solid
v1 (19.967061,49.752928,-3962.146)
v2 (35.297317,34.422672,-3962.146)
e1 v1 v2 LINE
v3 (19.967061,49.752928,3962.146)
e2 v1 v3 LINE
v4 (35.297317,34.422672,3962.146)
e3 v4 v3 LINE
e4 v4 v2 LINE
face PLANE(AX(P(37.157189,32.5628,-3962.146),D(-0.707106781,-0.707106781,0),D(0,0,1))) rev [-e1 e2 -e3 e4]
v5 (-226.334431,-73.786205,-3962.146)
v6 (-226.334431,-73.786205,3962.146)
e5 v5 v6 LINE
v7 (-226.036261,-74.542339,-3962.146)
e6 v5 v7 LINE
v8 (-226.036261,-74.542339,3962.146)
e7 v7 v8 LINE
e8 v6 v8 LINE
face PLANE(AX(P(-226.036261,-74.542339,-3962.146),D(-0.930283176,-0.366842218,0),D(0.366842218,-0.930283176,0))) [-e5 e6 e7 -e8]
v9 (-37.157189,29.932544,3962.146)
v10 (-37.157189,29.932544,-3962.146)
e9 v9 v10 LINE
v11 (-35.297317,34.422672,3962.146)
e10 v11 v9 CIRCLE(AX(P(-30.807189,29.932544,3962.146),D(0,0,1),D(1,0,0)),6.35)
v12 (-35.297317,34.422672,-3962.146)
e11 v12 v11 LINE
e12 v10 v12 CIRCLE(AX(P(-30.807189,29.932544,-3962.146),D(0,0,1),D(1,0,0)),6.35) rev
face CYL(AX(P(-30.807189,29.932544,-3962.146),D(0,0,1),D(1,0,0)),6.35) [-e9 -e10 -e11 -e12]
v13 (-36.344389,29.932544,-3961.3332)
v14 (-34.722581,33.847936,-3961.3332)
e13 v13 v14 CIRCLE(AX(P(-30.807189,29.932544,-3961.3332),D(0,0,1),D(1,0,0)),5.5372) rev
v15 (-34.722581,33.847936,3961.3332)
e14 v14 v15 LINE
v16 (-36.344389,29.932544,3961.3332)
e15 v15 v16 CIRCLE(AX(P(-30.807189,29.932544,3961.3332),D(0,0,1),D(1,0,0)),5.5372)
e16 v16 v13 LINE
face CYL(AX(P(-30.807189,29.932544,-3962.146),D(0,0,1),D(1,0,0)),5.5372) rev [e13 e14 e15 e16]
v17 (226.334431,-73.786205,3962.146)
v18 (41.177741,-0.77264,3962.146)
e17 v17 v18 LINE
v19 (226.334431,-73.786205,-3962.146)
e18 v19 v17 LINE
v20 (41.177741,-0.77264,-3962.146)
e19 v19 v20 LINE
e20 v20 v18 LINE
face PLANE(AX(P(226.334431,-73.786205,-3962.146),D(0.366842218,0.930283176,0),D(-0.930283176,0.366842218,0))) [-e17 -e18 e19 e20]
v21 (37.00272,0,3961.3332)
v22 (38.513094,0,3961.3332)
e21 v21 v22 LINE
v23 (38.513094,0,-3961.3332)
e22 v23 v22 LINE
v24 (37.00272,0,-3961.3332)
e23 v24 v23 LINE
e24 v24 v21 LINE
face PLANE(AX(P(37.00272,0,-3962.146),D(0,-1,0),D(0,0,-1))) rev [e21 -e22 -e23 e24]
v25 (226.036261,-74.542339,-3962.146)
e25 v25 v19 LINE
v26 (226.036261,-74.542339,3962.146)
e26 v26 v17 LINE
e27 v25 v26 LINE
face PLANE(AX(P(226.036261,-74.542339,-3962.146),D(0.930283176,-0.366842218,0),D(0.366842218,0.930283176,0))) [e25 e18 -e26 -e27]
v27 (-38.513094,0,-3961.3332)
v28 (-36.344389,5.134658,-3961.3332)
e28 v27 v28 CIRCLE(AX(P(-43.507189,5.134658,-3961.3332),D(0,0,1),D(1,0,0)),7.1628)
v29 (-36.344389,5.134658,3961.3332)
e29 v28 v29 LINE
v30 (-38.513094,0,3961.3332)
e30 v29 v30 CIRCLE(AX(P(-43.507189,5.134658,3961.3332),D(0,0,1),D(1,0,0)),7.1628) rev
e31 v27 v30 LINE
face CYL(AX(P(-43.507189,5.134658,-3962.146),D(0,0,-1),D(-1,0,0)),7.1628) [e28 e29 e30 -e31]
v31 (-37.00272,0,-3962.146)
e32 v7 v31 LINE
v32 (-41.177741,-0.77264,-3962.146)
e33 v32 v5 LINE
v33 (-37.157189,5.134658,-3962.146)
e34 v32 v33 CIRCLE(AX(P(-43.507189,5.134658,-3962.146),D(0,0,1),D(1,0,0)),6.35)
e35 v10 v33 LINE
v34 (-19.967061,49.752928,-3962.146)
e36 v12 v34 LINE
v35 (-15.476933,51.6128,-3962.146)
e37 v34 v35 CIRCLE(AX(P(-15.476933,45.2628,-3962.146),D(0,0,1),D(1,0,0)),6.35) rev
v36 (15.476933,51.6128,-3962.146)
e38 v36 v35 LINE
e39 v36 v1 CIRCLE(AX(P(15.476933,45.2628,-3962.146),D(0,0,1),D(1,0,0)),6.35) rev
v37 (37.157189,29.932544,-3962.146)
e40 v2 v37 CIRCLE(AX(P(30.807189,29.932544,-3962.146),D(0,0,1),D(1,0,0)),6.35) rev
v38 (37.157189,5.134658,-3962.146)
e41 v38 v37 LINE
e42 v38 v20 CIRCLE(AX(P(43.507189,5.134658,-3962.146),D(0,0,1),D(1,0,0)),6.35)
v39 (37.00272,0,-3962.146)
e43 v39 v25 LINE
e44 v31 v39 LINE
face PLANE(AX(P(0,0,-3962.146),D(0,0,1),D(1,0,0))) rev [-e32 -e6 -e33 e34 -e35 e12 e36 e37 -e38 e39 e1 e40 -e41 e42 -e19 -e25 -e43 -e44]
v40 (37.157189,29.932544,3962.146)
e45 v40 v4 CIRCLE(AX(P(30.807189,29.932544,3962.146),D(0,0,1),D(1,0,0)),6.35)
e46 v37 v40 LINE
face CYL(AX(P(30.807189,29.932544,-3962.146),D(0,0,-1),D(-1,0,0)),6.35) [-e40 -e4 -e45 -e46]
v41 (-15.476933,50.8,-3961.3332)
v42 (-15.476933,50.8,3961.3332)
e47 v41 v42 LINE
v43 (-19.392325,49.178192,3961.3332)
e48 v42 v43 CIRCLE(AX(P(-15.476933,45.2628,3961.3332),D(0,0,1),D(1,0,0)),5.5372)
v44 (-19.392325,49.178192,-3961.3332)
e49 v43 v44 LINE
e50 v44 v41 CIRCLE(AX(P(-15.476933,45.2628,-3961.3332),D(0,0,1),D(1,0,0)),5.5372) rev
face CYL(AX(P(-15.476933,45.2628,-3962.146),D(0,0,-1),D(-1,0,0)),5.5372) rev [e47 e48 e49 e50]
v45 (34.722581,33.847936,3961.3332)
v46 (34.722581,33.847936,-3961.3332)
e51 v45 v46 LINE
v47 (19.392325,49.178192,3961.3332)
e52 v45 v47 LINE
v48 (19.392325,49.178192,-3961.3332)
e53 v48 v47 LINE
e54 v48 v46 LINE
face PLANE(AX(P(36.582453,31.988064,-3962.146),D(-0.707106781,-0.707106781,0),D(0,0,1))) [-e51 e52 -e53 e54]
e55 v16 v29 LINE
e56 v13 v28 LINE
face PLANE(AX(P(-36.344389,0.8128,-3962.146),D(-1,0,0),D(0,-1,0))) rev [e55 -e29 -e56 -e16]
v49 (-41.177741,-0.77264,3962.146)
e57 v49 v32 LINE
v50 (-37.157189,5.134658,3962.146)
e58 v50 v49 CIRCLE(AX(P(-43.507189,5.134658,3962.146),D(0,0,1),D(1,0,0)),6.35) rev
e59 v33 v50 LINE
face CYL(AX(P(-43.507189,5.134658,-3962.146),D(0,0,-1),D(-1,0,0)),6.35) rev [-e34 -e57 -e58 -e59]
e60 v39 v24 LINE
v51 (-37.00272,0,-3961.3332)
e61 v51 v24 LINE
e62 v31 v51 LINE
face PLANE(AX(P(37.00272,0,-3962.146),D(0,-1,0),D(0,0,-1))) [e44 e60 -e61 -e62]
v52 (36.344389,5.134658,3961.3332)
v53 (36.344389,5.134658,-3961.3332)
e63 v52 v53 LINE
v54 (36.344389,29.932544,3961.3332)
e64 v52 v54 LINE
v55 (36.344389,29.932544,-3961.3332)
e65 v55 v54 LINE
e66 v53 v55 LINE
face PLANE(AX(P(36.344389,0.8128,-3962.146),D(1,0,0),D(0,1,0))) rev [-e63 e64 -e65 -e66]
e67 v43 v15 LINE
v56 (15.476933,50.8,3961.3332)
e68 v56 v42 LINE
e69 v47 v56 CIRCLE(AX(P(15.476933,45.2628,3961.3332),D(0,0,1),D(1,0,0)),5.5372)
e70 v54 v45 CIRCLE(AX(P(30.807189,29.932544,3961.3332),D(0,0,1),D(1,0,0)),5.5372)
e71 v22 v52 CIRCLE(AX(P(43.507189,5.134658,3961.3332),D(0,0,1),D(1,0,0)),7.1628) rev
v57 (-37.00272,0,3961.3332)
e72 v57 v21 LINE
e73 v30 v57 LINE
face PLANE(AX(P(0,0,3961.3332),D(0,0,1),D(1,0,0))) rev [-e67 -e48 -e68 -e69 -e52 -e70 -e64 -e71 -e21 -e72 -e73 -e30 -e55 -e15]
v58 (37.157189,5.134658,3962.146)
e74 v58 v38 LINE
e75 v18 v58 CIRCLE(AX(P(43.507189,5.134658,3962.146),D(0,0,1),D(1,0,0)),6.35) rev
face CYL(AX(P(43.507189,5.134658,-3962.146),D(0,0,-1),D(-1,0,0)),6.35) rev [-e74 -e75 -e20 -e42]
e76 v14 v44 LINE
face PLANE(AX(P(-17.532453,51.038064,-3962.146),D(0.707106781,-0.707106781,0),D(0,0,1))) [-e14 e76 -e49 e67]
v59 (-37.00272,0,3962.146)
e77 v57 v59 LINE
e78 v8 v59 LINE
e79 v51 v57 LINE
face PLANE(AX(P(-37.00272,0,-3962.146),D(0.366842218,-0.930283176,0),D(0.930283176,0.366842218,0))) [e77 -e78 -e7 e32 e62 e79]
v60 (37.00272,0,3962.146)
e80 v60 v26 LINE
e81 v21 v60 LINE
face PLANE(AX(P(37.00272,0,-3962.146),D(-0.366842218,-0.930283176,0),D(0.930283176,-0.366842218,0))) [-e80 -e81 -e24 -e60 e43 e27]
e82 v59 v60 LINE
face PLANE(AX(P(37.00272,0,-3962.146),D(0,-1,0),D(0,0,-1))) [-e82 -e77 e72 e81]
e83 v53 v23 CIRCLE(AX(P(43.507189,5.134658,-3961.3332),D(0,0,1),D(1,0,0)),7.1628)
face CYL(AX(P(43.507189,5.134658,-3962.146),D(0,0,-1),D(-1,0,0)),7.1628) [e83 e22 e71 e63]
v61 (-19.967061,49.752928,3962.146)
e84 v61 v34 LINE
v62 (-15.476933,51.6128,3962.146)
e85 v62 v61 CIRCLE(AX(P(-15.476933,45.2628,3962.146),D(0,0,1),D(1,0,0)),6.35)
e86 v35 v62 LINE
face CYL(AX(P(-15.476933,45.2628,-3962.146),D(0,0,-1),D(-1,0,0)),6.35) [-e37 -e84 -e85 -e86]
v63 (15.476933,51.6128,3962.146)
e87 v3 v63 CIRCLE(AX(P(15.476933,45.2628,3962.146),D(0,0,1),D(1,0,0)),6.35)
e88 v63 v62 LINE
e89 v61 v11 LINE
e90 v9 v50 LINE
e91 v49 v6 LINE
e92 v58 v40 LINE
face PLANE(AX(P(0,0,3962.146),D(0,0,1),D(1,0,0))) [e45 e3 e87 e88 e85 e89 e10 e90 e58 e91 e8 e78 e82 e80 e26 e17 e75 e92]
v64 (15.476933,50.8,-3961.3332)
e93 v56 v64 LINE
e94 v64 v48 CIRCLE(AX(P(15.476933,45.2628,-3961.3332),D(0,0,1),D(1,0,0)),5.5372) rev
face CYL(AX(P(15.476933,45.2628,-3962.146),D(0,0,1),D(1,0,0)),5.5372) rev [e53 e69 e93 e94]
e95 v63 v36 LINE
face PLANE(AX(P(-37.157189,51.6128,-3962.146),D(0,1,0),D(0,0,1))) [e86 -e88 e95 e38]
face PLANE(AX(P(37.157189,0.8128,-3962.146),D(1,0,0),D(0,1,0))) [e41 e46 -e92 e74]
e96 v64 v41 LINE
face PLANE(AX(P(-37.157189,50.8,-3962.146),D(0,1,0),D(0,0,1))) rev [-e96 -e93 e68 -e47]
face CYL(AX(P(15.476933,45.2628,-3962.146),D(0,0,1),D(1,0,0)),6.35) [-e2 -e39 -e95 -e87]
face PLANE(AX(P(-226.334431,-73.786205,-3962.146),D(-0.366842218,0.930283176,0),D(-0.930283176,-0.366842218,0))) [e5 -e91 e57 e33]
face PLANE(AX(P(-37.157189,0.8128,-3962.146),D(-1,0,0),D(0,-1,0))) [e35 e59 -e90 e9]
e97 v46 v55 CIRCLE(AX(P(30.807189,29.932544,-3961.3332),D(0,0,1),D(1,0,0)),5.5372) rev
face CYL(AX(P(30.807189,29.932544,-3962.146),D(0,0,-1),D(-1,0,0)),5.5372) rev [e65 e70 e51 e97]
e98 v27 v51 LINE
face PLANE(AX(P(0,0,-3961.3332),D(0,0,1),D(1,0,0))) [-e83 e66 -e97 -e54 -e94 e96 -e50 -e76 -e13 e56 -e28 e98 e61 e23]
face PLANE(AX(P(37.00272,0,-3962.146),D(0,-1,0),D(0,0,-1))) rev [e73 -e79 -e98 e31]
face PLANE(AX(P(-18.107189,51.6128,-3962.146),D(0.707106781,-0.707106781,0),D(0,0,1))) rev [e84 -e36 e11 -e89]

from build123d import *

# Parameters (mm, degrees)
BOSS_EXTRUDE1_DEPTH      = 3962.146
BOSS_EXTRUDE1_DEPTH_BACK = 3962.146
CHAMFER1_SIZE            = 19.05
FILLET1_R                = 6.35
SHELL1_START             = -3961.3332
SHELL1_DEPTH             = 7922.6664


# Read off the part's stored shape, not the designer's step: Shell1
with BuildPart() as part:
    # Sketch1 → Boss-Extrude1 (new, two sides: drawn at the far end of the back side and taken through both)
    with BuildSketch(Plane.XY.offset(-BOSS_EXTRUDE1_DEPTH_BACK)):
        Polygon((-37.157189229, 0.8128), (-37.157189229, 51.6128), (37.157189229, 51.6128), (37.157189229, 0.8128), (226.334430672, -73.786204522), (226.036261318, -74.542338687), (37.00272, 0), (-37.00272, 0), (-226.036261318, -74.542338687), (-226.334430672, -73.786204522), align=None)
    extrude(amount=BOSS_EXTRUDE1_DEPTH + BOSS_EXTRUDE1_DEPTH_BACK)

    # Chamfer1
    chamfer1_edges = [part.edges().sort_by_distance(p)[0] for p in [
        (-37.157189229, 51.6128, 0),
        (37.157189229, 51.6128, 0),
    ]]
    chamfer(chamfer1_edges, length=CHAMFER1_SIZE)

    # Fillet1
    fillet1_edges = [part.edges().sort_by_distance(p)[0] for p in [
        (-37.157189229, 0.8128, 0),
        (37.157189229, 0.8128, 0),
        (37.157189229, 32.5628, 0),
        (-18.107189229, 51.6128, 0),
        (18.107189229, 51.6128, 0),
        (-37.157189229, 32.5628, 0),
    ]]
    fillet(fillet1_edges, radius=FILLET1_R)

    # Shell1 outline → Shell1 (cut)
    with BuildSketch(Plane.XY.offset(SHELL1_START)):
        with BuildLine():
            ThreePointArc((-36.344389229, 5.13465814), (-36.90880265, 2.347724631), (-38.513093754, 0))
            Line((-38.513093754, 0), (38.513093754, 0))
            ThreePointArc((38.513093754, 0), (36.90880265, 2.347724631), (36.344389229, 5.13465814))
            Line((36.344389229, 5.13465814), (36.344389229, 29.932543879))
            ThreePointArc((36.344389229, 29.932543879), (35.922894977, 32.051538581), (34.722580898, 33.847935548))
            Line((34.722580898, 33.847935548), (19.392324777, 49.178191669))
            ThreePointArc((19.392324777, 49.178191669), (17.59592781, 50.378505747), (15.476933108, 50.8))
            Line((15.476933108, 50.8), (-15.476933108, 50.8))
            ThreePointArc((-15.476933108, 50.8), (-17.59592781, 50.378505747), (-19.392324777, 49.178191669))
            Line((-19.392324777, 49.178191669), (-34.722580898, 33.847935548))
            ThreePointArc((-34.722580898, 33.847935548), (-35.922894977, 32.051538581), (-36.344389229, 29.932543879))
            Line((-36.344389229, 29.932543879), (-36.344389229, 5.13465814))
        make_face()
    extrude(amount=SHELL1_DEPTH, mode=Mode.SUBTRACT)


solid = part.part
